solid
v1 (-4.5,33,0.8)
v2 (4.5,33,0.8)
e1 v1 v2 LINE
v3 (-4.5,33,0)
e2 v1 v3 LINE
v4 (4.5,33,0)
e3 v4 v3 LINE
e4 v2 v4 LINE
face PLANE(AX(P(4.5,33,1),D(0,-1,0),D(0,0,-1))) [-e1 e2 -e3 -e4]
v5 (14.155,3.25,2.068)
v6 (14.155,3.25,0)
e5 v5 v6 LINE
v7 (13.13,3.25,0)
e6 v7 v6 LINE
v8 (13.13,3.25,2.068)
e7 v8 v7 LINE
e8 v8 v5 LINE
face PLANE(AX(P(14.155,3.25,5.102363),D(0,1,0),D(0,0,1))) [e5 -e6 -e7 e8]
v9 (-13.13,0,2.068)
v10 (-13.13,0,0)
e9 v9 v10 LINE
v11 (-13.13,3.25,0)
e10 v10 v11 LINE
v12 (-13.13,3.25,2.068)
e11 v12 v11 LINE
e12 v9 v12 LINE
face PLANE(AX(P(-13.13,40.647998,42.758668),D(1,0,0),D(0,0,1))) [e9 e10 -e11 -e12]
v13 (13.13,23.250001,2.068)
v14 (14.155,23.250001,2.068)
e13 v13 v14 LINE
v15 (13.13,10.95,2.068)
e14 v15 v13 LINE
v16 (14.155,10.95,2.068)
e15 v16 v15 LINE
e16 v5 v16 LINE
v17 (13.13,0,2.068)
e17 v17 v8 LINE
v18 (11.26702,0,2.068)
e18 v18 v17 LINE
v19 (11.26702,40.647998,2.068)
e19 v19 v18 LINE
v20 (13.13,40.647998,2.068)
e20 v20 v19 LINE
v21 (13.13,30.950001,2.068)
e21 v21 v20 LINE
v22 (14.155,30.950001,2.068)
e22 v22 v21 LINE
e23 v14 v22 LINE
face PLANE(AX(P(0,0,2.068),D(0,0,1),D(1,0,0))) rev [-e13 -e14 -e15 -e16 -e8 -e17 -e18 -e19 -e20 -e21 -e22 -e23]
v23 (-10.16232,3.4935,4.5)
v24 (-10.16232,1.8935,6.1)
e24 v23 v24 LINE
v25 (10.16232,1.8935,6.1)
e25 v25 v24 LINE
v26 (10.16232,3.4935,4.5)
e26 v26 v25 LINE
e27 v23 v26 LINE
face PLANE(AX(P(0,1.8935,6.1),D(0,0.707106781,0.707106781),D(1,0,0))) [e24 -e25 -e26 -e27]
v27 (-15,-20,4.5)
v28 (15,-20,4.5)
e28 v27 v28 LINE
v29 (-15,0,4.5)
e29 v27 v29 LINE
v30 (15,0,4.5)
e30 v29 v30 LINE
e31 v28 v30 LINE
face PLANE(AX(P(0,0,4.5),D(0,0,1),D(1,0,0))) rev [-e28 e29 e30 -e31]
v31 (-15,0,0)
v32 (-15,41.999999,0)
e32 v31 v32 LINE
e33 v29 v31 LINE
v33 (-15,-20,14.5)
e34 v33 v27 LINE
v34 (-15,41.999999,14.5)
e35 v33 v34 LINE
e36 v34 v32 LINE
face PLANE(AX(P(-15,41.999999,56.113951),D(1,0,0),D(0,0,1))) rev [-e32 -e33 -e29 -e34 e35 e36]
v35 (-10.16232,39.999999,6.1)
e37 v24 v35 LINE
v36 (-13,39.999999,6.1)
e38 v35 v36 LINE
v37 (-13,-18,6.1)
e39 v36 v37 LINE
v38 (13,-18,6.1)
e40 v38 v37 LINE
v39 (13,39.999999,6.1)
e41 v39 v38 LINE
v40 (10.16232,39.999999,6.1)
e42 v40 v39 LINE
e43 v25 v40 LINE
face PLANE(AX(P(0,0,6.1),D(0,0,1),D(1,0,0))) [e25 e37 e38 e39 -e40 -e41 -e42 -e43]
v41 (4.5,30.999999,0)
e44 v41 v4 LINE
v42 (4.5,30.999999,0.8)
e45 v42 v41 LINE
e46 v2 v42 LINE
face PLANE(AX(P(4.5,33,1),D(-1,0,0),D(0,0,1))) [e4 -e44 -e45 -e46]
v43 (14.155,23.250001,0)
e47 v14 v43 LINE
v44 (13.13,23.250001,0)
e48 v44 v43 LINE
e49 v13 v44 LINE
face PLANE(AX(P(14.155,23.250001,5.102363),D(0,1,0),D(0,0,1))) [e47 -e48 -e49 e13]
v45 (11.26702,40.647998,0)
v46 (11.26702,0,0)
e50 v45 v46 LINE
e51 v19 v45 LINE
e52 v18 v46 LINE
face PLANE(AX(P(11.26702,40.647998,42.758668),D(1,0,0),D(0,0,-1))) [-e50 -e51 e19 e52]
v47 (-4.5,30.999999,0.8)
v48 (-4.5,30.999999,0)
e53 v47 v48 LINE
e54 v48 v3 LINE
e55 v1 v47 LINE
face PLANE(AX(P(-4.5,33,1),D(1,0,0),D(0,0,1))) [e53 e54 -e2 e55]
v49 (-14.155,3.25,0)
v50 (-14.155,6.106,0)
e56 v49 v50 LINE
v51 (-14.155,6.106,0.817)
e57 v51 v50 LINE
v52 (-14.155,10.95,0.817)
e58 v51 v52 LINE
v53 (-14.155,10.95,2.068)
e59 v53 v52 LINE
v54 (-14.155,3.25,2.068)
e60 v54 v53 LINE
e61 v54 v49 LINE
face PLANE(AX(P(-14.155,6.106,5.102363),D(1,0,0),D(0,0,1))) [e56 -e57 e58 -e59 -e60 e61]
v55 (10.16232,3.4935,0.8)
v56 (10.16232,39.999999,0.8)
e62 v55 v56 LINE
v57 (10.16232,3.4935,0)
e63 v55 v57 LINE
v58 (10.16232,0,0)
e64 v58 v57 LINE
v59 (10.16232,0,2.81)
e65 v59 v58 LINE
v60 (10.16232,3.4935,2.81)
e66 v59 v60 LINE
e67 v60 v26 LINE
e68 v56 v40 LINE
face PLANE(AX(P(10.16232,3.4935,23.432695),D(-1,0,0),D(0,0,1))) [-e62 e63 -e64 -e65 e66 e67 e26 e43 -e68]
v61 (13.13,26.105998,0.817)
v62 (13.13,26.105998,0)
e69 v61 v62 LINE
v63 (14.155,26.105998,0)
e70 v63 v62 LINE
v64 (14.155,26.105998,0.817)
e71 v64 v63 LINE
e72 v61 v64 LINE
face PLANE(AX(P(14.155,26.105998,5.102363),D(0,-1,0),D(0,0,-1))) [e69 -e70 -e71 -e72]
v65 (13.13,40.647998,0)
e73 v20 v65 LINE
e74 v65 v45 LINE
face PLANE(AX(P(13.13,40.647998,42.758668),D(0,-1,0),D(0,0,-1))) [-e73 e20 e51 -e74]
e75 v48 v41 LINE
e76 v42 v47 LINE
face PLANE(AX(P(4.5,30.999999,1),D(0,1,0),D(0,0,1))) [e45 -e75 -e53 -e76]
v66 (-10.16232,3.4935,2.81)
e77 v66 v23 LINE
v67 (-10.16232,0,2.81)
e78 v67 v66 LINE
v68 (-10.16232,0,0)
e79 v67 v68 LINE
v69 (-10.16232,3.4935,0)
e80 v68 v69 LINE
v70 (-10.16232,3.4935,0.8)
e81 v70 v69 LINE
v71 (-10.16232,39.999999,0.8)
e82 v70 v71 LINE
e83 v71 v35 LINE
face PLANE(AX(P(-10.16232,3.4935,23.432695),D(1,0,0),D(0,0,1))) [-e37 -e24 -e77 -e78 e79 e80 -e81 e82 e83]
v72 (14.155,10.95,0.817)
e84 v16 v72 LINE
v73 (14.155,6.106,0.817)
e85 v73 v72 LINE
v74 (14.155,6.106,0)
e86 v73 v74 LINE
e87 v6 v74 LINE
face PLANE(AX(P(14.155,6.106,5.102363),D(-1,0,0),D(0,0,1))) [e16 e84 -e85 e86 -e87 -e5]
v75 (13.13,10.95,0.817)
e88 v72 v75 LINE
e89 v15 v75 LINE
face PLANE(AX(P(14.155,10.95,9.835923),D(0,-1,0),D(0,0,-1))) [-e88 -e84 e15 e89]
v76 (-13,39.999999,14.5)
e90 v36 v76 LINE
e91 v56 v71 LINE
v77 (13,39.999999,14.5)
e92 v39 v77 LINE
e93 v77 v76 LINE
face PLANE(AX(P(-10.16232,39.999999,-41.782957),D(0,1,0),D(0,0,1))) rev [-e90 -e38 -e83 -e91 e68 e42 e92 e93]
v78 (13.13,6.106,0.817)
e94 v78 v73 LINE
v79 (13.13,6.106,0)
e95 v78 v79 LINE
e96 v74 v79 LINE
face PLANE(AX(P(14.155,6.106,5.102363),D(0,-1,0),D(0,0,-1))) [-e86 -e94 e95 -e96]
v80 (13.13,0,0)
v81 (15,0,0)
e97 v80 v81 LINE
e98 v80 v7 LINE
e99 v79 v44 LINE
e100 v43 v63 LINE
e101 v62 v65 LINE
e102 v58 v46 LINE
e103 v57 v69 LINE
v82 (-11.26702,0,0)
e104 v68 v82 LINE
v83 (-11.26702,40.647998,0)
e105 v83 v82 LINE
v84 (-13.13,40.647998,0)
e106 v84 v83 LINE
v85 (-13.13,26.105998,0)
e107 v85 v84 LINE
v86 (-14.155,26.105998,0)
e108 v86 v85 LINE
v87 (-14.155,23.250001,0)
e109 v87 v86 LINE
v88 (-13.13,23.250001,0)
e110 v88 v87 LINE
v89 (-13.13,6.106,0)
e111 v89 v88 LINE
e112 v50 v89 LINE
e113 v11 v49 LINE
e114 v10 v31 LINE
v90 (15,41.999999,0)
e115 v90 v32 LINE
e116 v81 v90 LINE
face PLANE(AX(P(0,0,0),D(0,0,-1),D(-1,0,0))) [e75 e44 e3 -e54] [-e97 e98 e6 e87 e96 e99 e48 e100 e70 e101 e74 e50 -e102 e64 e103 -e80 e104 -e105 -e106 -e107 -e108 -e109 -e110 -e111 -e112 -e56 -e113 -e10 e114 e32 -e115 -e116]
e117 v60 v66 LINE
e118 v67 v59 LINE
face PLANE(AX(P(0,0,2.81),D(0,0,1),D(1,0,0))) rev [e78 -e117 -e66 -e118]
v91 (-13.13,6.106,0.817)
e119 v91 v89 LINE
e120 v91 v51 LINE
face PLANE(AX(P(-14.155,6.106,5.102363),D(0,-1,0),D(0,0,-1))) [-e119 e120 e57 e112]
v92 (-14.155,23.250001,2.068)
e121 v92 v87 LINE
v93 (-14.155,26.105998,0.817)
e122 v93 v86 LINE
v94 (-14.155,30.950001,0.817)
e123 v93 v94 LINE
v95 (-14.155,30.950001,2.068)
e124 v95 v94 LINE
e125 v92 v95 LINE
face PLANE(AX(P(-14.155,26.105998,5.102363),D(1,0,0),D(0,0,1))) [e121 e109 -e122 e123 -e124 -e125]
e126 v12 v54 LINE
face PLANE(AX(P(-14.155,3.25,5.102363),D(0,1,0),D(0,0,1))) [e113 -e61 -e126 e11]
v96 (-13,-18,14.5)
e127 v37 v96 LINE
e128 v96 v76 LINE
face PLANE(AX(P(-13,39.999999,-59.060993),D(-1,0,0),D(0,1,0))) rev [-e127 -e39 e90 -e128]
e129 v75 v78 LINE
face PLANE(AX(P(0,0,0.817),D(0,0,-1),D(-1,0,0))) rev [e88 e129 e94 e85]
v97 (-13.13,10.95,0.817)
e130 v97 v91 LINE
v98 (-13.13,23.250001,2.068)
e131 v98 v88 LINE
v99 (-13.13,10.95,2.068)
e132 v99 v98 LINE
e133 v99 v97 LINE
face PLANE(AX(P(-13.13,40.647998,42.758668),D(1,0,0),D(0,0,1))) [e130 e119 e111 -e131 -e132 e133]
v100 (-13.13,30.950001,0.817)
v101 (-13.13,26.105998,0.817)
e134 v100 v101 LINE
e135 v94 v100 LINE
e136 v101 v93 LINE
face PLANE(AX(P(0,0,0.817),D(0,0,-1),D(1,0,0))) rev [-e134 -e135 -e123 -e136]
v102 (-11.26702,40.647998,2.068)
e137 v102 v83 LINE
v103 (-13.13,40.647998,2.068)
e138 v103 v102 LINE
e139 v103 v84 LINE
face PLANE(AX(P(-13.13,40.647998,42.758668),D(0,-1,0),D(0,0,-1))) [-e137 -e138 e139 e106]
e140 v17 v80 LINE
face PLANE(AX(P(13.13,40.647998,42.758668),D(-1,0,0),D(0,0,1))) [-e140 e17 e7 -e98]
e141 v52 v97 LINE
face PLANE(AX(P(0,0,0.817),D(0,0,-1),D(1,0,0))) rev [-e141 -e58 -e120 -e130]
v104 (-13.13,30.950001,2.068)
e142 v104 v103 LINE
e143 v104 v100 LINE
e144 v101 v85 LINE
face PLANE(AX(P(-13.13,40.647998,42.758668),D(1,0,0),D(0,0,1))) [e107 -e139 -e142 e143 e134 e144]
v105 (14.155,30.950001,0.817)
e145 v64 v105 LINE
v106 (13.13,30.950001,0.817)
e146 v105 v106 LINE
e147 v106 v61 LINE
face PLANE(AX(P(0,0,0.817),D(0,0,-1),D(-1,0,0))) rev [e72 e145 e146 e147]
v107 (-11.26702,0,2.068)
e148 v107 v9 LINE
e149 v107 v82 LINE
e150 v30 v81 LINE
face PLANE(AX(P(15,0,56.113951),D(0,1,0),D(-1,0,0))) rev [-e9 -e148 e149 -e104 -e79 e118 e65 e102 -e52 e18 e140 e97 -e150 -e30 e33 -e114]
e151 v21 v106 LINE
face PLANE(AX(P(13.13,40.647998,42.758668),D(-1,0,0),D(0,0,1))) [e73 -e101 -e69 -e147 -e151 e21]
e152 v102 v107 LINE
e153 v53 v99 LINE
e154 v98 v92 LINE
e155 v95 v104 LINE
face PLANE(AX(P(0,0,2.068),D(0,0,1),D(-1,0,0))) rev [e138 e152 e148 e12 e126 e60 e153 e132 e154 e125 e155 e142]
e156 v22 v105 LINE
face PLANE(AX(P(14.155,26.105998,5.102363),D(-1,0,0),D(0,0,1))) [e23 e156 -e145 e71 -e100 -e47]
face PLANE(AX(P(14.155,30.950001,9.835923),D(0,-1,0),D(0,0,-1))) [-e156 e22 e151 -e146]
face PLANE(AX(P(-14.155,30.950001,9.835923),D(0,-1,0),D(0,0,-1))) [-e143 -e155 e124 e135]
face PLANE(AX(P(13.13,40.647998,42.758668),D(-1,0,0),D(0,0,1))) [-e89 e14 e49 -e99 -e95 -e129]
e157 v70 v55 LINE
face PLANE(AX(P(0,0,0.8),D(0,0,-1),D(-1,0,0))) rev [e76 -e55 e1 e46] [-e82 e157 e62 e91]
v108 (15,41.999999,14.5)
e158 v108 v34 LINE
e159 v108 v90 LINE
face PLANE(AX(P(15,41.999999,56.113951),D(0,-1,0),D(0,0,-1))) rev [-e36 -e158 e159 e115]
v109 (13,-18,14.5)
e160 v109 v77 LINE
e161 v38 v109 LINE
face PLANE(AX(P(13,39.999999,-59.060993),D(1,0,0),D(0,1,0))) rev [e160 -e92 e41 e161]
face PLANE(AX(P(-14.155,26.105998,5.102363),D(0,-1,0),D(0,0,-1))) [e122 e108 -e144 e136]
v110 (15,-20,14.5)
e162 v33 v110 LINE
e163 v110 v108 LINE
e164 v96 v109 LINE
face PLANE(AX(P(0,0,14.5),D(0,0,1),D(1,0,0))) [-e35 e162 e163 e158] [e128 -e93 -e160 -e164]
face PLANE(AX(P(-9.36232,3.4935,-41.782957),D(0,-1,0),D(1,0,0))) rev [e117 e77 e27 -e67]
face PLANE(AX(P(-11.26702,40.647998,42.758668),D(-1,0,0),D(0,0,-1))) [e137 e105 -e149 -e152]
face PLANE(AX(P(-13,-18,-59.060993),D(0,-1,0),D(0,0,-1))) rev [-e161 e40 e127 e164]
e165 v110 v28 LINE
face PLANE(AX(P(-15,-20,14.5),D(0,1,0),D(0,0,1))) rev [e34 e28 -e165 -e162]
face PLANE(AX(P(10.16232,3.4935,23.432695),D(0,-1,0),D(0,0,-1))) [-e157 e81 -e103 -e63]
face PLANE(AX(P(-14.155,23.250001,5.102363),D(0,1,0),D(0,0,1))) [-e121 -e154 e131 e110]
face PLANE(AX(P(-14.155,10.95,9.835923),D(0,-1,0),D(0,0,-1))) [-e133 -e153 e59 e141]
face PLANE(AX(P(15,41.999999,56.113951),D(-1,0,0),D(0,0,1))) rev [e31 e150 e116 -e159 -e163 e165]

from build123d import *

# Parameters (mm, degrees)
SKETCH4_W           = 29.99999933
SKETCH4_H           = 41.999999434
BOSS_EXTRUDE2_DEPTH = 4.499999806
SKETCH5_W           = 1.862979494
SKETCH5_H           = 40.647998452
CUT_EXTRUDE1_DEPTH  = 2.068
SKETCH2_W           = 1.025000587
SKETCH2_H           = 2.855999861
SKETCH2_H_2         = 2.855997533
CUT_EXTRUDE2_DEPTH  = 2.068
SKETCH3_W           = 1.025000587
SKETCH3_H           = 7.699999958
SKETCH3_H_2         = 7.699999959
CUT_EXTRUDE3_DEPTH  = 1.251
SKETCH6_W           = 8.999999612
SKETCH6_H           = 2.000000328
CUT_EXTRUDE4_DEPTH  = 1
SKETCH7_W           = 20.324639976
SKETCH7_H           = 3.493499942
CUT_EXTRUDE6_DEPTH  = 2.81
CUT_EXTRUDE7_DEPTH  = 3.699999806
SKETCH9_W           = 29.99999933
SKETCH9_H           = 61.999998987
SKETCH9_W_2         = 20.324639976
SKETCH9_H_2         = 36.506499492
BOSS_EXTRUDE3_DEPTH = 10
SKETCH10_W          = 25.99999933
SKETCH10_H          = 57.999998987
CUT_EXTRUDE8_DEPTH  = 8.4
CHAMFER1_SIZE       = 1.6


# Read off the part's stored shape, not the designer's step: Surface-Imported1
with BuildPart() as part:
    # Sketch4 → Boss-Extrude2 (new body)
    with BuildSketch(Plane.XY):
        with Locations((0, 20.999999717)):
            Rectangle(SKETCH4_W, SKETCH4_H)
    extrude(amount=BOSS_EXTRUDE2_DEPTH)

    # Sketch5 → Cut-Extrude1 (cut)
    with BuildSketch(Plane.XY):
        with Locations((-12.198510114, 20.323999226)):
            Rectangle(SKETCH5_W, SKETCH5_H)
        with Locations((12.198510114, 20.323999226)):
            Rectangle(SKETCH5_W, SKETCH5_H)
    extrude(amount=CUT_EXTRUDE1_DEPTH, mode=Mode.SUBTRACT)

    # Sketch2 → Cut-Extrude2 (cut)
    with BuildSketch(Plane.XY):
        with Locations((13.642500155, 4.677999998)):
            Rectangle(SKETCH2_W, SKETCH2_H)
        with Locations((13.642500155, 24.677999318)):
            Rectangle(SKETCH2_W, SKETCH2_H_2)
    extrude(amount=CUT_EXTRUDE2_DEPTH, mode=Mode.SUBTRACT)

    # Sketch3 → Cut-Extrude3 (cut)
    with BuildSketch(Plane.XY.offset(0.816999993)):
        with Locations((13.642500155, 7.100000046)):
            Rectangle(SKETCH3_W, SKETCH3_H)
        with Locations((13.642500155, 27.100000531)):
            Rectangle(SKETCH3_W, SKETCH3_H_2)
    extrude(amount=CUT_EXTRUDE3_DEPTH, mode=Mode.SUBTRACT)

    # Sketch6 → Cut-Extrude4 (cut)
    with BuildSketch(Plane.XY):
        with Locations((0, 31.999999657)):
            Rectangle(SKETCH6_W, SKETCH6_H)
    extrude(amount=CUT_EXTRUDE4_DEPTH, mode=Mode.SUBTRACT)

    # Sketch7 → Cut-Extrude6 (cut)
    with BuildSketch(Plane.XY):
        with Locations((0, 1.746749971)):
            Rectangle(SKETCH7_W, SKETCH7_H)
    extrude(amount=CUT_EXTRUDE6_DEPTH, mode=Mode.SUBTRACT)

    # Sketch8 → Cut-Extrude7 (cut)
    with BuildSketch(Plane.XY.offset(4.499999806)):
        Polygon((-9.362319988, 3.493499942), (-10.162319988, 3.493499942), (-10.162319988, 39.999999434), (10.162319988, 39.999999434), (10.162319988, 3.493499942), (9.362319988, 3.493499942), align=None)
    extrude(amount=-CUT_EXTRUDE7_DEPTH, mode=Mode.SUBTRACT)

    # Sketch9 → Boss-Extrude3 (add)
    with BuildSketch(Plane.XY.offset(4.499999806)):
        with Locations((0, 10.999999941)):
            Rectangle(SKETCH9_W, SKETCH9_H)
        with Locations((0, 21.746749688)):
            Rectangle(SKETCH9_W_2, SKETCH9_H_2, mode=Mode.SUBTRACT)
    extrude(amount=BOSS_EXTRUDE3_DEPTH)

    # Sketch10 → Cut-Extrude8 (cut)
    with BuildSketch(Plane.XY.offset(14.499999806)):
        with Locations((0, 10.999999941)):
            Rectangle(SKETCH10_W, SKETCH10_H)
    extrude(amount=-CUT_EXTRUDE8_DEPTH, mode=Mode.SUBTRACT)

    # Chamfer1
    chamfer1_edges = [part.edges().sort_by_distance(p)[0] for p in [
        (0, 3.493499942, 6.099999806),
    ]]
    chamfer(chamfer1_edges, length=CHAMFER1_SIZE)


with BuildPart() as body_2:
    # Split1: the piece on the far side of the plane
    add(part.part)
    split(bisect_by=Plane(origin=(0, 0, 0), x_dir=(0, 0, 1), z_dir=(1, 0, 0)), keep=Keep.BOTTOM)


with BuildPart() as part_1:
    add(part.part)

    # Split1
    split(bisect_by=Plane(origin=(0, 0, 0), x_dir=(0, 0, 1), z_dir=(1, 0, 0)), keep=Keep.TOP)

    # Mirror1: part across plane


with BuildPart() as part_2:
    add(part_1.part)
    add(part_1.part.mirror(Plane(origin=(0, 0, 0), x_dir=(0, 0, 1), z_dir=(1, 0, 0))))


solid = part_2.part
